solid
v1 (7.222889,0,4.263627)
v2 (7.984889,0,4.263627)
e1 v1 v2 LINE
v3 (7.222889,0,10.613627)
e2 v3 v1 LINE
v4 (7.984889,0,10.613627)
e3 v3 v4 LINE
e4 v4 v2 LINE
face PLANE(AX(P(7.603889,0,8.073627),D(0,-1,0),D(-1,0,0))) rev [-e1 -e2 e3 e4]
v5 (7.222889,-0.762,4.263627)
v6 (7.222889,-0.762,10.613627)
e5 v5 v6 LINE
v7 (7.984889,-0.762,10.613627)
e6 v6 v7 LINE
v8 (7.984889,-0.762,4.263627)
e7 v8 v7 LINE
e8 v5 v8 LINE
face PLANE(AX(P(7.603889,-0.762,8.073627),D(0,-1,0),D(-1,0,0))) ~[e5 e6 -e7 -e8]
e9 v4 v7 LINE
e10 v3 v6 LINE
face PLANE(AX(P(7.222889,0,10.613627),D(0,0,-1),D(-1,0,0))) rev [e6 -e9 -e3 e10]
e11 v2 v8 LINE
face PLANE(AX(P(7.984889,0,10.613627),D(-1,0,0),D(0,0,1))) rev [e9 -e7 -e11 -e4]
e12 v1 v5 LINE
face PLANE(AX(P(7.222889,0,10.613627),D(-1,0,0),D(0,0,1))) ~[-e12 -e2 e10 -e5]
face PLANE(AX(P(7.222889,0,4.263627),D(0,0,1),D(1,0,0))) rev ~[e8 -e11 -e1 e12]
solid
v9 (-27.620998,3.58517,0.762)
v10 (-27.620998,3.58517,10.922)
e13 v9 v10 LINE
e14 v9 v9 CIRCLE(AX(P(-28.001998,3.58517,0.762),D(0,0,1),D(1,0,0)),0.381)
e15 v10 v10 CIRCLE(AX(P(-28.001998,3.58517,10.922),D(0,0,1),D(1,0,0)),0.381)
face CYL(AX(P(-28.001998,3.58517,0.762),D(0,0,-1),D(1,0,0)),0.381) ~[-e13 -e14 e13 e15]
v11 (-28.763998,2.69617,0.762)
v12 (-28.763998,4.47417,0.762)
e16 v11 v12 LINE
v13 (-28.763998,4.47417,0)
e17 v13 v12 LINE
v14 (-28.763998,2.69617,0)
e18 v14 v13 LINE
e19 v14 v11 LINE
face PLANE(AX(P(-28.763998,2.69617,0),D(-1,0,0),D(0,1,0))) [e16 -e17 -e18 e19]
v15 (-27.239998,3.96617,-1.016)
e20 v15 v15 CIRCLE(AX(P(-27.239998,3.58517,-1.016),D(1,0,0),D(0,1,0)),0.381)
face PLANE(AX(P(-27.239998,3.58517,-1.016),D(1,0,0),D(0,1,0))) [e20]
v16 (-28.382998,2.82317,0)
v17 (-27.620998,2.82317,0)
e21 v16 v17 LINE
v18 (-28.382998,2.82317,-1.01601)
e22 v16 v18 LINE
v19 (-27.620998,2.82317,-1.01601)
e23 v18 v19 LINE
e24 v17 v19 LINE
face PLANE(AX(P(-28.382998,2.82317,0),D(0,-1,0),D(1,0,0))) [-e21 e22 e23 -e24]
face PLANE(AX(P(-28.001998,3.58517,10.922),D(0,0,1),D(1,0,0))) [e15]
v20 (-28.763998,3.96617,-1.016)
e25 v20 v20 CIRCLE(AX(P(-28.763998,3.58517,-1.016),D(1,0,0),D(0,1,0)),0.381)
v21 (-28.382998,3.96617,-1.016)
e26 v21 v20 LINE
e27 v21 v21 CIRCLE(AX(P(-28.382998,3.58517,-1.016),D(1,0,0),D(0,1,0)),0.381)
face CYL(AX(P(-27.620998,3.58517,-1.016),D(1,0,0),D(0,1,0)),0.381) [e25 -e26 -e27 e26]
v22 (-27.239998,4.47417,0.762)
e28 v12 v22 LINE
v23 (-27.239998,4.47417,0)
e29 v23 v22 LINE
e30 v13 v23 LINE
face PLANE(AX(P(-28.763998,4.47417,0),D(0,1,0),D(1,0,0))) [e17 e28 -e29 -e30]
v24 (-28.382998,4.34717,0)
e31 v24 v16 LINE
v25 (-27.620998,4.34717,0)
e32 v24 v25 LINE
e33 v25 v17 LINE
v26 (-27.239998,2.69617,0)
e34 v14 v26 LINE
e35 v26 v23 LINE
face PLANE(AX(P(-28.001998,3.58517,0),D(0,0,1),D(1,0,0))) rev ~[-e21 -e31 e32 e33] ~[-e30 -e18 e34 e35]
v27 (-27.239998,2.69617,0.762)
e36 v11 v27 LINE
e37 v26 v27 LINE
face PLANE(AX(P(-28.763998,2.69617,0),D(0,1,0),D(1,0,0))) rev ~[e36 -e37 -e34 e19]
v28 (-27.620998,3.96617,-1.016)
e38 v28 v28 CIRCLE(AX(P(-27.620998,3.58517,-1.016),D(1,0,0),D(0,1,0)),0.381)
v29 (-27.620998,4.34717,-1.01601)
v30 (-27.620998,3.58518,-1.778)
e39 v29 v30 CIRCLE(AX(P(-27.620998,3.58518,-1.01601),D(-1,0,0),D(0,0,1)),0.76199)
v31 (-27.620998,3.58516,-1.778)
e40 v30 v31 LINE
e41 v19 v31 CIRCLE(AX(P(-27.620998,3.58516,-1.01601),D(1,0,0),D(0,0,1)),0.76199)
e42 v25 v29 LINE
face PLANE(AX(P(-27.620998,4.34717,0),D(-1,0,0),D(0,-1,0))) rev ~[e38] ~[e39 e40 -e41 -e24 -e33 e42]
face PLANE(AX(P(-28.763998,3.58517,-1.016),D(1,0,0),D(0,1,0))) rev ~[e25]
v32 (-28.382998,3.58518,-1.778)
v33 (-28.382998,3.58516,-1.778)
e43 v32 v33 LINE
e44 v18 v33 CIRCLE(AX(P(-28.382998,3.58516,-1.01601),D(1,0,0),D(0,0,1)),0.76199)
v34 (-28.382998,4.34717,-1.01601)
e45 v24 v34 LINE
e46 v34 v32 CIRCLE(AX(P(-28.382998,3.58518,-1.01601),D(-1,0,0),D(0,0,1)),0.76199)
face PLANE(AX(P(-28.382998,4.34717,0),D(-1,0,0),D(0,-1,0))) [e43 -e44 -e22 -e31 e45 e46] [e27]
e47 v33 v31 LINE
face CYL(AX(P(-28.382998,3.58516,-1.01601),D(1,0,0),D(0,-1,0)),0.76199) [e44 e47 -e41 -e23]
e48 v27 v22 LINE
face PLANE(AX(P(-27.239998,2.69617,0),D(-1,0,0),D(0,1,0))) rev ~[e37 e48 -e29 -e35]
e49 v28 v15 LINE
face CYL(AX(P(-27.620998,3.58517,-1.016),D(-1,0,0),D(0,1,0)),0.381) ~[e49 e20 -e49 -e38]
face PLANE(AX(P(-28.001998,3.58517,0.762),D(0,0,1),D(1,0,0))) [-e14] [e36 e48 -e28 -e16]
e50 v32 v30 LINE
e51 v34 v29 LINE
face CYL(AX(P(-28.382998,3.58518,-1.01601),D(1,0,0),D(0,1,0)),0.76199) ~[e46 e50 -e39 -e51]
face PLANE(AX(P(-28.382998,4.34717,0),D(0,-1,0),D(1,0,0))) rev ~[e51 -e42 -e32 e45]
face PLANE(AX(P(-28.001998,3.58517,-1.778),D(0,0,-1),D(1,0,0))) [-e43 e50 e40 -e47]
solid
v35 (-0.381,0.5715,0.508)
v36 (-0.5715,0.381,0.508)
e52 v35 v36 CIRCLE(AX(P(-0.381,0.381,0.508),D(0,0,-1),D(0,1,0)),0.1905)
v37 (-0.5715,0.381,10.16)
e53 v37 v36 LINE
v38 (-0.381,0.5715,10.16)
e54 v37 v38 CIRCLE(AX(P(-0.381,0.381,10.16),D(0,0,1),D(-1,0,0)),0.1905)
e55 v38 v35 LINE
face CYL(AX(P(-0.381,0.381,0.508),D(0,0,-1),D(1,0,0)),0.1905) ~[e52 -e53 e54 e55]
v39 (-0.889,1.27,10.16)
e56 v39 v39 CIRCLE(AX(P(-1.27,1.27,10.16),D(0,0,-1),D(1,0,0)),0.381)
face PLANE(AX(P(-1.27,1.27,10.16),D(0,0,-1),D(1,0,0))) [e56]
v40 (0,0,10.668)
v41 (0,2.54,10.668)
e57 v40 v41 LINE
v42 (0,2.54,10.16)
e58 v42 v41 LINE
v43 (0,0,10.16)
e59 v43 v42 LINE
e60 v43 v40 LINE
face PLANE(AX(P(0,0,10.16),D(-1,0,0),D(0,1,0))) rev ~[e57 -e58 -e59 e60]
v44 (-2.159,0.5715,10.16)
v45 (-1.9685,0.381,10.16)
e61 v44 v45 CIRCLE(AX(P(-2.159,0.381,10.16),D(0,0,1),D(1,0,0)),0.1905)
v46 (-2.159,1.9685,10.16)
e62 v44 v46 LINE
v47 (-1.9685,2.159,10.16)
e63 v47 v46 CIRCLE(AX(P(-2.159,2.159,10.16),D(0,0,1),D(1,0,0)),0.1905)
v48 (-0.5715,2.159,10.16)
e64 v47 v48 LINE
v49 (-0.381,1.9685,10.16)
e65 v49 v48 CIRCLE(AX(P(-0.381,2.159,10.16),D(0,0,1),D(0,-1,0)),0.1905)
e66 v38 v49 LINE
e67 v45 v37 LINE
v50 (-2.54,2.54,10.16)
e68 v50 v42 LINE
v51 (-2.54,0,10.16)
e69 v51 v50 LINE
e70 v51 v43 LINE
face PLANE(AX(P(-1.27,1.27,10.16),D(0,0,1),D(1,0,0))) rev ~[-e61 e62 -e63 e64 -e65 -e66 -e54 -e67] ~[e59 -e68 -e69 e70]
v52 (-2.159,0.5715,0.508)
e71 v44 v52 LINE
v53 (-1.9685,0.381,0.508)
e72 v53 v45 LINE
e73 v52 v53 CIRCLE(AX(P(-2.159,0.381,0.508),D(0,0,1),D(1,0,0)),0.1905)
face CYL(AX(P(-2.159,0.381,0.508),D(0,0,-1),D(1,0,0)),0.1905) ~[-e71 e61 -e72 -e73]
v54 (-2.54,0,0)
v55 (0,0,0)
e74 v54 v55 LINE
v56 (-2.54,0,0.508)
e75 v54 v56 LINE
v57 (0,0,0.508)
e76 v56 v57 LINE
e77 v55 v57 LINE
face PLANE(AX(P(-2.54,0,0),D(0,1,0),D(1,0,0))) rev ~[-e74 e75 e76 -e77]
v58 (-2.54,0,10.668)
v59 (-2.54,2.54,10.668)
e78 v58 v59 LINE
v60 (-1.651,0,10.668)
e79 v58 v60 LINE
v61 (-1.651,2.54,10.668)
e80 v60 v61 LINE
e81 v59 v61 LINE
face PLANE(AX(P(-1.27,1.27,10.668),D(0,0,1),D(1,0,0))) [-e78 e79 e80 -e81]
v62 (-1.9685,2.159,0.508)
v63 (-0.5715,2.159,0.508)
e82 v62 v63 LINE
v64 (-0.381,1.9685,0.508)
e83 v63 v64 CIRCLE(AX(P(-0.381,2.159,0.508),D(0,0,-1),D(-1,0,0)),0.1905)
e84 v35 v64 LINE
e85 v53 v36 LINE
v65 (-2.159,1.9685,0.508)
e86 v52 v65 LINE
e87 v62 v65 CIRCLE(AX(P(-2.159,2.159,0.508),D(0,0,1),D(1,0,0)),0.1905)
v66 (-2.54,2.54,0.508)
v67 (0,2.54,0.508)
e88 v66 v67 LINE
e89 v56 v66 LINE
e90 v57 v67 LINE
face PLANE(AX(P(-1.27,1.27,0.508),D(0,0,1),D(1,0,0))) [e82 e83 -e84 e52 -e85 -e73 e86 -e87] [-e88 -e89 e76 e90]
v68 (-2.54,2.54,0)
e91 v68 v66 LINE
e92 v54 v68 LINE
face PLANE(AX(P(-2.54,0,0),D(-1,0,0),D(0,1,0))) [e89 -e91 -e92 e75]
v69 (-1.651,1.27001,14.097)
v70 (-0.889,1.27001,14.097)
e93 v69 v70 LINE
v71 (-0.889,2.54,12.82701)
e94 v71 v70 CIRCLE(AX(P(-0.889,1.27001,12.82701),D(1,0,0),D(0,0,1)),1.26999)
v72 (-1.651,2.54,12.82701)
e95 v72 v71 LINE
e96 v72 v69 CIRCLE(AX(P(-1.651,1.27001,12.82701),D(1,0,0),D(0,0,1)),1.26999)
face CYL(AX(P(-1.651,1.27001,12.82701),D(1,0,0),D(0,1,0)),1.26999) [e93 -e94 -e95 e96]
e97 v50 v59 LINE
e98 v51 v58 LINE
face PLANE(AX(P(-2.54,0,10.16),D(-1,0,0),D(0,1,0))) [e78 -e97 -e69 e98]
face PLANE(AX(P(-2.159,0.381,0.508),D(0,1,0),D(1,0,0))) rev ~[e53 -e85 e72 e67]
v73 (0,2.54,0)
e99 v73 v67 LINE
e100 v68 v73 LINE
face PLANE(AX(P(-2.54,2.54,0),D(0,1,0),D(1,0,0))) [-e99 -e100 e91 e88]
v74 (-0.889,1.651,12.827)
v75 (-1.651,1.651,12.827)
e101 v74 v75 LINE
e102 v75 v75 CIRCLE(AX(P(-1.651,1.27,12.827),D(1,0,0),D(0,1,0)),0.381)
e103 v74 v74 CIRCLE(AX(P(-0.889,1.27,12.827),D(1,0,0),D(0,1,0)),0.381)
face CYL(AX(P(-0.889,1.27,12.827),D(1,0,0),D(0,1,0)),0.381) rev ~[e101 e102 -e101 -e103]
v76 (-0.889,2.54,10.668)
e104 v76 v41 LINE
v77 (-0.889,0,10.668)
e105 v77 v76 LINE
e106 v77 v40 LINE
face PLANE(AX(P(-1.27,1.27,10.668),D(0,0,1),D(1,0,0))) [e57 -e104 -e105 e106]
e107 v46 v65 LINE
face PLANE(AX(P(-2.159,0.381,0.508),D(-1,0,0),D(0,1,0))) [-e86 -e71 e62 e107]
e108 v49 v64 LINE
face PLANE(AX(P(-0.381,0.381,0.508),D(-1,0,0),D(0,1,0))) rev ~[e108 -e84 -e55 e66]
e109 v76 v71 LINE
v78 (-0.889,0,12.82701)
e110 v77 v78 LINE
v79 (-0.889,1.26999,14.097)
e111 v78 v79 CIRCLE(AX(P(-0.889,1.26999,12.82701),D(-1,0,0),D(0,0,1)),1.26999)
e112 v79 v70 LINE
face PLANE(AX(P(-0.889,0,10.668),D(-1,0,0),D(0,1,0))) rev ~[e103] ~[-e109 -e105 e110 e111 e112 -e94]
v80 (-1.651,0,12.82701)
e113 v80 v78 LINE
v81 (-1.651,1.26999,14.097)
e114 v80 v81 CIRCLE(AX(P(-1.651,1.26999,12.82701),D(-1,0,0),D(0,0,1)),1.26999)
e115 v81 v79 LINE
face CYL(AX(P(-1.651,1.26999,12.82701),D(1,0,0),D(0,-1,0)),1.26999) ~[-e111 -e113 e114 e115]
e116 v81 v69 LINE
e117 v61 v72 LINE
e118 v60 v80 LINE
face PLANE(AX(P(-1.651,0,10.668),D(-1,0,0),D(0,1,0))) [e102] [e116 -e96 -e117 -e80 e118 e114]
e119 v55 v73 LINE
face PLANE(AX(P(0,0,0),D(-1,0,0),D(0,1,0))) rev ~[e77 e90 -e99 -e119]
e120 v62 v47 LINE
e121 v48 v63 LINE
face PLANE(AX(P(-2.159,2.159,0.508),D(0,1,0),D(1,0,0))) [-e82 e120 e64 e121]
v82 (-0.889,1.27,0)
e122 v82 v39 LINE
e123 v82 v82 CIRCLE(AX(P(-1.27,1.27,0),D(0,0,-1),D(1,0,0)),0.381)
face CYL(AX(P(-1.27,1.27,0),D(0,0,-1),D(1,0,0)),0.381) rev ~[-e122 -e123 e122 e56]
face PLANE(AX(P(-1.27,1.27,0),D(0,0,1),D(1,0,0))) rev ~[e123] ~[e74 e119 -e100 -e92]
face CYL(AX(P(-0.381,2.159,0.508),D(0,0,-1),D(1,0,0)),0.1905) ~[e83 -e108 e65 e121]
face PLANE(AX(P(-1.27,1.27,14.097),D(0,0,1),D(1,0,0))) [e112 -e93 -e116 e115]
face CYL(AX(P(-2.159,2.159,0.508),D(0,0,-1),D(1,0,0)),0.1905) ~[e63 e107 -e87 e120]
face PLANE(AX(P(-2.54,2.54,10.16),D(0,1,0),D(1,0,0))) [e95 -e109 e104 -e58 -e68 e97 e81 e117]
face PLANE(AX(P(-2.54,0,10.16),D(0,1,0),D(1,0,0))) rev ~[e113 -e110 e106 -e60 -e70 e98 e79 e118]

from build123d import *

# Parameters (mm, degrees)
F0_W           = 2.54
F0_H           = 2.54
F1_DEPTH       = 0.508
F3_R           = 0.1905
F2_W           = 1.778
F2_H           = 1.778
F4_DEPTH       = 9.652
F5_W           = 2.54
F5_H           = 2.54
F6_DEPTH       = 0.508
F7_W           = 0.762
F7_H           = 2.54
F8_DEPTH       = 3.429
F9_R           = 1.26999
F10_R          = 0.381
F11_DEPTH      = 10.16
F12_W          = 1.524
F12_H          = 1.778
F13_DEPTH      = 0.762
F14_R          = 0.381
F15_DEPTH      = 10.16
F16_W          = 0.762
F16_H          = 1.524
F17_DEPTH      = 1.778
F18_R          = 0.76199
F20_R          = 0.381
F21_DEPTH      = 0.381
F21_DEPTH_BACK = 1.143
F19_R          = 0.381
F22_DEPTH      = 0.762
F23_W          = 0.762
F23_H          = 5.08
F24_DEPTH      = 0.762


# Not quite as in the source:
# - a fillet or chamfer is up to 0.001 mm smaller than in the source, because OpenCascade refuses the exact size
# - a pattern or mirror of a feature is missing from the dataset's text; its kind, count and spacing are read off the source's solid
# - a feature names something its author has since deleted; it is built from what else it names


with BuildPart() as f1:
    # F0 (on Top) → F1 (new body)
    with BuildSketch(Plane.XY):
        with Locations((-1.27, 1.27)):
            Rectangle(F0_W, F0_H)
    extrude(amount=F1_DEPTH)

    # F3 (on face) + F2 (on face) → F4 (join)
    with BuildSketch(Plane.XY.offset(0.508)):
        with Locations((-2.159, 0.381)):
            Circle(F3_R)
        with Locations((-0.381, 0.381)):
            Circle(F3_R)
        with Locations((-0.381, 2.159)):
            Circle(F3_R)
        with Locations((-2.159, 2.159)):
            Circle(F3_R)
    with BuildSketch(Plane.XY.offset(0.508)):
        with Locations((-1.27, 1.27)):
            Rectangle(F2_W, F2_H)
    extrude(amount=F4_DEPTH)

    # F5 (on face) → F6 (join)
    with BuildSketch(Plane.XY.offset(10.16)):
        with Locations((-1.27, 1.27)):
            Rectangle(F5_W, F5_H)
    extrude(amount=F6_DEPTH)

    # F7 (on face) → F8 (join)
    with BuildSketch(Plane.XY.offset(10.668)):
        with Locations((-1.27, 1.27)):
            Rectangle(F7_W, F7_H)
    extrude(amount=F8_DEPTH)

    # F9 (radius 1.27 in the source; OpenCascade refuses exactly that, so slightly less here)
    f9_edges = [f1.edges().sort_by_distance(p)[0] for p in [
        (-1.27, 0, 14.097),
        (-1.27, 2.54, 14.097),
    ]]
    fillet(f9_edges, radius=F9_R)

    # F10 (on face) → F11 (cut)
    with BuildSketch(Plane(origin=(0, 0, 0), x_dir=(1, 0, 0), z_dir=(0, 0, -1))):
        with Locations((-1.27, -1.27)):
            Circle(F10_R)
    extrude(amount=-F11_DEPTH, mode=Mode.SUBTRACT)

    # F19 (on face) → F22 (cut)
    with BuildSketch(Plane.YZ.offset(-0.889)):
        with Locations((1.27, 12.827)):
            Circle(F19_R)
    extrude(amount=-F22_DEPTH, mode=Mode.SUBTRACT)


with BuildPart() as f13:
    # F12 (on Top) → F13 (new body)
    with BuildSketch(Plane.XY):
        with Locations((-28.0019982215, 3.5851696832)):
            Rectangle(F12_W, F12_H)
    extrude(amount=F13_DEPTH)

    # F14 (on face) → F15 (join)
    with BuildSketch(Plane.XY.offset(0.762)):
        with Locations((-28.0019982215, 3.5851696832)):
            Circle(F14_R)
    extrude(amount=F15_DEPTH)

    # F16 (on face) → F17 (join)
    with BuildSketch(Plane(origin=(0, 0, 0), x_dir=(1, 0, 0), z_dir=(0, 0, -1))):
        with Locations((-28.0019982215, -3.5851696832)):
            Rectangle(F16_W, F16_H)
    extrude(amount=F17_DEPTH)

    # F18 (radius 0.762 in the source; OpenCascade refuses exactly that, so slightly less here)
    f18_edges = [f13.edges().sort_by_distance(p)[0] for p in [
        (-28.001998, 2.82317, -1.778),
        (-28.001998, 4.34717, -1.778),
    ]]
    fillet(f18_edges, radius=F18_R)

    # F20 (on face) → F21 (join, two sides)
    with BuildSketch(Plane.YZ.offset(-27.6209982215)) as f21_sk:
        with Locations((3.5851696832, -1.016)):
            Circle(F20_R)
    extrude(amount=F21_DEPTH)
    extrude(f21_sk.sketch, amount=-F21_DEPTH_BACK)


with BuildPart() as f24:
    # F23 (on Front) → F24 (new body)
    with BuildSketch(Plane.XZ):
        with Locations((7.6038887042, 6.803626753)):
            Rectangle(F23_W, F23_H)
    extrude(amount=F24_DEPTH)

    # F24_copies: F24 across plane


with BuildPart() as f24_1:
    add(f24.part)
    add(f24.part.mirror(Plane.XY.offset(7.438627)))


solid = Compound([f1.part, f13.part, f24_1.part])
